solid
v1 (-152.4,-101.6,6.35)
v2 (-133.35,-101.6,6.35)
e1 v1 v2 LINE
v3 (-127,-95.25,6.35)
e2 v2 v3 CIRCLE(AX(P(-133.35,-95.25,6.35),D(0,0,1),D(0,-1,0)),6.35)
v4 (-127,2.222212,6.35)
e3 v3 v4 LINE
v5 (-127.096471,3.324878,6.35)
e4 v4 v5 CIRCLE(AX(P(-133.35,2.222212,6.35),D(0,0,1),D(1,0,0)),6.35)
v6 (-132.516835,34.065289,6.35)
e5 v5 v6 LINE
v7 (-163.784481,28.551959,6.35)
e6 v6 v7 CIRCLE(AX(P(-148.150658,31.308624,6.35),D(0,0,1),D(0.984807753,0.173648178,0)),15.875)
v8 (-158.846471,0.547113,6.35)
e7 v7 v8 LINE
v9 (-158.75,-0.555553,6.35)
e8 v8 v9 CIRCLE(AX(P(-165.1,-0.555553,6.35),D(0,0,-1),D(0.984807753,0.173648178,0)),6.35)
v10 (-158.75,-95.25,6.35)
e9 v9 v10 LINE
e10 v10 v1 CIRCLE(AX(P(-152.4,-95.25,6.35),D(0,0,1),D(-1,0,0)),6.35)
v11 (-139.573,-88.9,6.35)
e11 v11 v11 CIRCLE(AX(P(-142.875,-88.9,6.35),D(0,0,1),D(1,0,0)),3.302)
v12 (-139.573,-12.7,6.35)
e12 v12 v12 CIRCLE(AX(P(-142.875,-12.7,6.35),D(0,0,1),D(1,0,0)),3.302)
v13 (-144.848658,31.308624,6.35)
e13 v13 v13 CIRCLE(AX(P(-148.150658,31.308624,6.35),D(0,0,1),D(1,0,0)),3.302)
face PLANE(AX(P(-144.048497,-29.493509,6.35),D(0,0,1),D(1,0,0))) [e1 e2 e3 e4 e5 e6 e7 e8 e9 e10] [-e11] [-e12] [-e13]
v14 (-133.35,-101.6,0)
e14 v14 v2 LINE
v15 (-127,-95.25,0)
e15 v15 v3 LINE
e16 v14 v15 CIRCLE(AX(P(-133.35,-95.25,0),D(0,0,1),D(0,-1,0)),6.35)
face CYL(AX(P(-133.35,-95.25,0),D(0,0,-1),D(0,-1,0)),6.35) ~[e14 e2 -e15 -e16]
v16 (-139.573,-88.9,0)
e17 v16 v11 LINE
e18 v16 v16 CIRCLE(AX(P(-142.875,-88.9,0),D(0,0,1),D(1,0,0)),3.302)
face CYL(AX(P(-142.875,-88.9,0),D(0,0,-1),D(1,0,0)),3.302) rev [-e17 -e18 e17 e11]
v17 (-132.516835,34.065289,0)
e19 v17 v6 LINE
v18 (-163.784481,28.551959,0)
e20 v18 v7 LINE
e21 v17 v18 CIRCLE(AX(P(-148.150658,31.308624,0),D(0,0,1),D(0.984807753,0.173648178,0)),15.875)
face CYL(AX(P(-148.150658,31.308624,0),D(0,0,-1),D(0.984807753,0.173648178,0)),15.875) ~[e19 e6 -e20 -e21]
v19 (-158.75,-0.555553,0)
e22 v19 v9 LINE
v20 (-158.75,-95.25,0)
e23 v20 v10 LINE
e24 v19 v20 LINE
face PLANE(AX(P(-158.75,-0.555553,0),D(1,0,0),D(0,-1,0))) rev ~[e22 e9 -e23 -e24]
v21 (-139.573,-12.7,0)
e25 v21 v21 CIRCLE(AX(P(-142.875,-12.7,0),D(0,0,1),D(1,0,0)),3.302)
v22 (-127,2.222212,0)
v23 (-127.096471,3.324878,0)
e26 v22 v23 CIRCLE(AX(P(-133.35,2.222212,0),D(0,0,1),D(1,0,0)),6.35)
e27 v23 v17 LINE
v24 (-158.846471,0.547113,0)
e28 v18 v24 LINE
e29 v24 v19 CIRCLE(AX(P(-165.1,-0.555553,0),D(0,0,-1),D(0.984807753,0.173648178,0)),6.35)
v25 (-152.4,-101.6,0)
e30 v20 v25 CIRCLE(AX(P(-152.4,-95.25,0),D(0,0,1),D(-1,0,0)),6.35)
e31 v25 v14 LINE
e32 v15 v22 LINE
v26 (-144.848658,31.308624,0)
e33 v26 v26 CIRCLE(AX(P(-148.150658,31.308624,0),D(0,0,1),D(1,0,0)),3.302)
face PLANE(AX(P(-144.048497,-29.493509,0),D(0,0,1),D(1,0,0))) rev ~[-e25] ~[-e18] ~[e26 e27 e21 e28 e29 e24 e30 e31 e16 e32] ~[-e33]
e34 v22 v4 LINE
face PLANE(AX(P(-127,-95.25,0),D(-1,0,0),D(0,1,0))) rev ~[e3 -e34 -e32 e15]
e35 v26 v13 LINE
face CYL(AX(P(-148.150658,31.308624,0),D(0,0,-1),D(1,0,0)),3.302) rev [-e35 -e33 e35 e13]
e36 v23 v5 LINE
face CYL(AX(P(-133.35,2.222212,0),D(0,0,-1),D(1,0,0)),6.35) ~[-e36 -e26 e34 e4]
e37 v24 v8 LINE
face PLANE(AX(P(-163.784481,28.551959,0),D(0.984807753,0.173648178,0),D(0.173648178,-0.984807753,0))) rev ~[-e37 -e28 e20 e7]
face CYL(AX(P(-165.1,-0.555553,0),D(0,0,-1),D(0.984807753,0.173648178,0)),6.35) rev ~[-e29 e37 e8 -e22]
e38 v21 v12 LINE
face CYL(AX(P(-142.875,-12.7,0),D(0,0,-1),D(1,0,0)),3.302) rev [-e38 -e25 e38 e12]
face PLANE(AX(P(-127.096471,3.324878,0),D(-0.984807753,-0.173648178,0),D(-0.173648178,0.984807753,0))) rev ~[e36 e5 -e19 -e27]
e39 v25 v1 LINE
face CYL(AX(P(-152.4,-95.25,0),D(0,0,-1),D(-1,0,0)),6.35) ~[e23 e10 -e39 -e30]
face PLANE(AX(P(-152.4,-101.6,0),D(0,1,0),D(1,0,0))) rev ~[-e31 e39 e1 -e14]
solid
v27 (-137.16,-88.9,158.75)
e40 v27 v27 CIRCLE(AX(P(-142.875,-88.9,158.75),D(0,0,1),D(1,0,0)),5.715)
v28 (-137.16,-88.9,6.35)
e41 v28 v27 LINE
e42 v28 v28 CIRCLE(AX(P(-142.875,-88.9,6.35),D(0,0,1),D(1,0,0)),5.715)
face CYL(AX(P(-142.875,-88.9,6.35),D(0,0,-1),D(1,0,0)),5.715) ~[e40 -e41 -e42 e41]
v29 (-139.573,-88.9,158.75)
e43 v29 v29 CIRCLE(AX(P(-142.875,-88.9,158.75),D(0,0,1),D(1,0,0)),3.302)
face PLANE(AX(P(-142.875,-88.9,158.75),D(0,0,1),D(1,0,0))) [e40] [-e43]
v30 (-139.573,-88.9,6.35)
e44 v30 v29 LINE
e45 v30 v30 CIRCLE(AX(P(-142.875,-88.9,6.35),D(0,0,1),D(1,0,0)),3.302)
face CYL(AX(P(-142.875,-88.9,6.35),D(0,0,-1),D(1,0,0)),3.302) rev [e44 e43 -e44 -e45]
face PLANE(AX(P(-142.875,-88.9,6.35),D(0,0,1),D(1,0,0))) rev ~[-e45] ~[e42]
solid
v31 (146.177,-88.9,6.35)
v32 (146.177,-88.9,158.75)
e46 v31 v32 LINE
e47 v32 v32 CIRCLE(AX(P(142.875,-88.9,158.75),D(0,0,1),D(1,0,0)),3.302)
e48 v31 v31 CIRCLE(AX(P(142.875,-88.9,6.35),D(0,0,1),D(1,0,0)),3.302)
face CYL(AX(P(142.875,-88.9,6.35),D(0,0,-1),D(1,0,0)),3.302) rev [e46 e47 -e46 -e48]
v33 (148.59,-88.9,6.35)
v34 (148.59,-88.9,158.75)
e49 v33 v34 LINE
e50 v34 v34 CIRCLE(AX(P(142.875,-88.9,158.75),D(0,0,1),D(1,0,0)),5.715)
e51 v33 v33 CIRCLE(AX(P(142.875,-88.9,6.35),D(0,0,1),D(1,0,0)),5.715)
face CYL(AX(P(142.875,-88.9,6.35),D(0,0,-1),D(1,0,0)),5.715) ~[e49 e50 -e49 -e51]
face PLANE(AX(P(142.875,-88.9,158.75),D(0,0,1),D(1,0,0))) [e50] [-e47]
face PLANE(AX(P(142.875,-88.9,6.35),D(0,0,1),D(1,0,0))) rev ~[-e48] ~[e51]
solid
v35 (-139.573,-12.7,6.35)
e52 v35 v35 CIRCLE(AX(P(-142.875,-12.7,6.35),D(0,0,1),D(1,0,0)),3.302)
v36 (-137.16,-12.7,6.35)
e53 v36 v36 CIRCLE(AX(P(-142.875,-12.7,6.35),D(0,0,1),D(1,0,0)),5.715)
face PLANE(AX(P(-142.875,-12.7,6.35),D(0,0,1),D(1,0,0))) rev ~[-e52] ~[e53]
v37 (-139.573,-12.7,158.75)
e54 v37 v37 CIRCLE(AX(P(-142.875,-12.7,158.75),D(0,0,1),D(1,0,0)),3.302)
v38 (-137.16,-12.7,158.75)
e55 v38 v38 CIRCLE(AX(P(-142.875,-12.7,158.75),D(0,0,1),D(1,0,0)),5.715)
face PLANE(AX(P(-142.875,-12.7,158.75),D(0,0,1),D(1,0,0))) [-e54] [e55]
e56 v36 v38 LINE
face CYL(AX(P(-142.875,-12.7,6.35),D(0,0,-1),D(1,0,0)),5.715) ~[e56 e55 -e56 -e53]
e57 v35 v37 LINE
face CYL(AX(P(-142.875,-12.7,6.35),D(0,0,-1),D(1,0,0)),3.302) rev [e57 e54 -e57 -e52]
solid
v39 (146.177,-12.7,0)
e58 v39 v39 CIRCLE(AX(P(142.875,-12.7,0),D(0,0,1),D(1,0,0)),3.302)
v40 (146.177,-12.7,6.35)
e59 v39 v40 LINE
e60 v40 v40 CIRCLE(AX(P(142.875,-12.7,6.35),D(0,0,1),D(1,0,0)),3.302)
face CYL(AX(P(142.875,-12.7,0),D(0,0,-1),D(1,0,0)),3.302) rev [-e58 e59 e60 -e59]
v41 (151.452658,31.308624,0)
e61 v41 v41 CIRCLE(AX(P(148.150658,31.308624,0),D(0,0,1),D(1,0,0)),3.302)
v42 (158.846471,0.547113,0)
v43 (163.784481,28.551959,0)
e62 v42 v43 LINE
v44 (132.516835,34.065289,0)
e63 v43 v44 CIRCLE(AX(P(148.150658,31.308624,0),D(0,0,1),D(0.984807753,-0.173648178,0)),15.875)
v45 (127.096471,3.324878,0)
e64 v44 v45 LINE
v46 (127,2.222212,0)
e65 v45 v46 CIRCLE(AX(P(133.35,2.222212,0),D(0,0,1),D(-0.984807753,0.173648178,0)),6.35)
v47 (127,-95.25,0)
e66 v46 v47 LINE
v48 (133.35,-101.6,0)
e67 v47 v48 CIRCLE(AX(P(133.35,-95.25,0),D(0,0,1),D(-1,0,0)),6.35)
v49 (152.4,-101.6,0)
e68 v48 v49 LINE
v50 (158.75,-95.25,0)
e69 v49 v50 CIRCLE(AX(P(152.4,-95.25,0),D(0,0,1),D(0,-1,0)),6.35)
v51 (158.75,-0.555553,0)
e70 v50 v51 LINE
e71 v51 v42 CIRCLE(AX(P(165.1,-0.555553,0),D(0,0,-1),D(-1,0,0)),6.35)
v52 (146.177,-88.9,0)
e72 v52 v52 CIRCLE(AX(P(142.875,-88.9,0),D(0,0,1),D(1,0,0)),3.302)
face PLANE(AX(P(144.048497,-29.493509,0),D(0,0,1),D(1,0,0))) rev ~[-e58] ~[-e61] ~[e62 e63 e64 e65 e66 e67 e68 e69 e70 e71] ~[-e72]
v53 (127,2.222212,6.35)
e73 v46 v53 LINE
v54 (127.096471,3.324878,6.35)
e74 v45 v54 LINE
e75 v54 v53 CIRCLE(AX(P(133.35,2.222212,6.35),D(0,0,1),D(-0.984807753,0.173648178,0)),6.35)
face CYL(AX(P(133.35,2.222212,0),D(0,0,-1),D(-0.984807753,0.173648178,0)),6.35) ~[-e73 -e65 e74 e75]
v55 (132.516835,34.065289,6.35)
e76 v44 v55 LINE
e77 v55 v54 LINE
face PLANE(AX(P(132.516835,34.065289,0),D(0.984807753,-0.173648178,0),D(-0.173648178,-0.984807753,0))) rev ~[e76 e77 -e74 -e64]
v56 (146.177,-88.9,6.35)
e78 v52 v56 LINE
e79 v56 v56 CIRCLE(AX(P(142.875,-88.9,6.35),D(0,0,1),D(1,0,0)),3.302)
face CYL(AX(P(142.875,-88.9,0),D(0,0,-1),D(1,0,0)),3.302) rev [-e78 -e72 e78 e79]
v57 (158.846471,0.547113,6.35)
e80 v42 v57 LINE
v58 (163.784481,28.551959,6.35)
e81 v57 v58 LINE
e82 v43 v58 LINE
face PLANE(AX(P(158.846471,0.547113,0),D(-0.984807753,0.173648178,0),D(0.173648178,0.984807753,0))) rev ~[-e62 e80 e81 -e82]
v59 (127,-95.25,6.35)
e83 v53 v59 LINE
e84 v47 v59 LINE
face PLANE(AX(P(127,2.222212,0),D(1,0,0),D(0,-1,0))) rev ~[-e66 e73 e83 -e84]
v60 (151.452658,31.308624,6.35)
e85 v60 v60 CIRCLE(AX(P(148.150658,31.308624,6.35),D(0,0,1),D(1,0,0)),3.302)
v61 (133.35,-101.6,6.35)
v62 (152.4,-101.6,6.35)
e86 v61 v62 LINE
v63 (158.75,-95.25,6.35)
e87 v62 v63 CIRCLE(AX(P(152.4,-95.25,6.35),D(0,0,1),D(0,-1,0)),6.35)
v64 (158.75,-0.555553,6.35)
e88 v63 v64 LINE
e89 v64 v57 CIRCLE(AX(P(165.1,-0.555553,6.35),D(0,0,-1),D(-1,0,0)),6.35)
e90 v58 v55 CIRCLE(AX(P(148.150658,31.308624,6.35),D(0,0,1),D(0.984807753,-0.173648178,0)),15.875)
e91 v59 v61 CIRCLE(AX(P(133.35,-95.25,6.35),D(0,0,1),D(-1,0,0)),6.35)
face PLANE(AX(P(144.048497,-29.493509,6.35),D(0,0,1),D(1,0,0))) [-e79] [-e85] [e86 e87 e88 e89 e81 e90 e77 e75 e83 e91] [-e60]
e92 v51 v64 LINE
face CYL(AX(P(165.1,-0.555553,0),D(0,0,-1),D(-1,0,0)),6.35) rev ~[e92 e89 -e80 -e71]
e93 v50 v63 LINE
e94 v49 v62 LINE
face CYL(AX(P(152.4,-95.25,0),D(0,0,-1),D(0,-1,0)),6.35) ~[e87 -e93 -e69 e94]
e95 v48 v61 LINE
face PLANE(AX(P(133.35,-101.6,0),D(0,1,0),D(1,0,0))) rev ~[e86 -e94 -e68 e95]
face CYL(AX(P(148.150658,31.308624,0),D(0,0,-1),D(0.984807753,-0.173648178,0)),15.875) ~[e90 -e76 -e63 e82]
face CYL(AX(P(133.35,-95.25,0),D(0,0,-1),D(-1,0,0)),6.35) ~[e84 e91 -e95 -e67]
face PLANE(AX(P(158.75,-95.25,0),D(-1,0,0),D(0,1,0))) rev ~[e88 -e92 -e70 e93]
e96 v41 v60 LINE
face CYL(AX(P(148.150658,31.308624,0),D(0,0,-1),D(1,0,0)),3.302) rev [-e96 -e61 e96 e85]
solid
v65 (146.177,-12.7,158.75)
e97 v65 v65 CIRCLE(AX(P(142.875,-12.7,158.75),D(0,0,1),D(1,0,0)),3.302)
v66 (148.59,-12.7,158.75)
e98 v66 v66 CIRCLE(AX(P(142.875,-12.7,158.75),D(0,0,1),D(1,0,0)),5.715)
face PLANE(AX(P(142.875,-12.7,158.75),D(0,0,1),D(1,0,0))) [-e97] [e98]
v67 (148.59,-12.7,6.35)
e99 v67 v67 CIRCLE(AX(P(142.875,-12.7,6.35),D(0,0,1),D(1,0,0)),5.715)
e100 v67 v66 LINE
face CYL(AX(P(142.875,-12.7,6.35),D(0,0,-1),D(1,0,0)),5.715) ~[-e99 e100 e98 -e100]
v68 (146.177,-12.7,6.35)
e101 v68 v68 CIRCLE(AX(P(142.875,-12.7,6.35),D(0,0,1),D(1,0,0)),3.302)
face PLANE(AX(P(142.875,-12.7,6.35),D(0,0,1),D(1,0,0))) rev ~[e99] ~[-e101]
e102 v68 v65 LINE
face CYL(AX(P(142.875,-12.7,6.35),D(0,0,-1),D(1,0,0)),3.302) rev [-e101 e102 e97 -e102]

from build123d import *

# Parameters (mm, degrees)
F0_R     = 3.302
F1_DEPTH = 6.35
F2_R     = 5.715
F2_R_2   = 3.302
F3_DEPTH = 152.4


# Not quite as in the source:
# - a feature names something its author has since deleted; it is built from what else it names


with BuildPart() as f1:
    # F0 (on Top) → F1 (new body)
    with BuildSketch(Plane.XY):
        with BuildLine():
            ThreePointArc((-132.5168345954, 34.0652888097), (-150.9073224949, 46.9424470683), (-163.7844807535, 28.5519591688))
            Line((-163.7844807535, 28.5519591688), (-158.8464707684, 0.5471129148))
            ThreePointArc((-158.8464707684, 0.5471129148), (-158.7741636671, -0.0021140469), (-158.75, -0.5555530134))
            Line((-158.75, -0.5555530134), (-158.75, -95.25))
            ThreePointArc((-158.75, -95.25), (-156.8901280605, -99.7401280605), (-152.4, -101.6))
            Line((-152.4, -101.6), (-133.35, -101.6))
            ThreePointArc((-133.35, -101.6), (-128.8598719395, -99.7401280605), (-127, -95.25))
            Line((-127, -95.25), (-127, 0))
            Line((-127, 0), (-127, 2.2222120536))
            ThreePointArc((-127, 2.2222120536), (-127.0241636671, 2.77565102), (-127.0964707684, 3.3248779817))
            Line((-127.0964707684, 3.3248779817), (-132.5168345954, 34.0652888097))
        make_face()
        with Locations((-142.875, -88.9)):
            Circle(F0_R, mode=Mode.SUBTRACT)
        with Locations((-142.875, -12.7)):
            Circle(F0_R, mode=Mode.SUBTRACT)
        with Locations((-148.1506576745, 31.3086239893)):
            Circle(F0_R, mode=Mode.SUBTRACT)
    extrude(amount=F1_DEPTH)


with BuildPart() as f1b:
    # F0 (on Top) → F1, piece 2 (new body)
    with BuildSketch(Plane.XY):
        with BuildLine():
            ThreePointArc((163.7844807535, 28.5519591688), (150.9073224949, 46.9424470683), (132.5168345954, 34.0652888097))
            Line((132.5168345954, 34.0652888097), (127.0964707684, 3.3248779817))
            ThreePointArc((127.0964707684, 3.3248779817), (127.0241636671, 2.77565102), (127, 2.2222120536))
            Line((127, 2.2222120536), (127, 0))
            Line((127, 0), (127, -95.25))
            ThreePointArc((127, -95.25), (128.8598719395, -99.7401280605), (133.35, -101.6))
            Line((133.35, -101.6), (152.4, -101.6))
            ThreePointArc((152.4, -101.6), (156.8901280605, -99.7401280605), (158.75, -95.25))
            Line((158.75, -95.25), (158.75, -0.5555530134))
            ThreePointArc((158.75, -0.5555530134), (158.7741636671, -0.0021140469), (158.8464707684, 0.5471129148))
            Line((158.8464707684, 0.5471129148), (163.7844807535, 28.5519591688))
        make_face()
        with Locations((142.875, -88.9)):
            Circle(F0_R, mode=Mode.SUBTRACT)
        with Locations((142.875, -12.7)):
            Circle(F0_R, mode=Mode.SUBTRACT)
        with Locations((148.1506576745, 31.3086239893)):
            Circle(F0_R, mode=Mode.SUBTRACT)
    extrude(amount=F1_DEPTH)


with BuildPart() as f3:
    # F2 (on face) → F3 (new body)
    with BuildSketch(Plane.XY.offset(6.35)):
        with Locations((-142.875, -12.7)):
            Circle(F2_R)
        with Locations((-142.875, -12.7)):
            Circle(F2_R_2, mode=Mode.SUBTRACT)
    extrude(amount=F3_DEPTH)


with BuildPart() as f3b:
    # F2 (on face) → F3, piece 2 (new body)
    with BuildSketch(Plane.XY.offset(6.35)):
        with Locations((-142.875, -88.9)):
            Circle(F2_R)
        with Locations((-142.875, -88.9)):
            Circle(F2_R_2, mode=Mode.SUBTRACT)
    extrude(amount=F3_DEPTH)


with BuildPart() as f3c:
    # F2 (on face) → F3, piece 3 (new body)
    with BuildSketch(Plane.XY.offset(6.35)):
        with Locations((142.875, -12.7)):
            Circle(F2_R)
        with Locations((142.875, -12.7)):
            Circle(F2_R_2, mode=Mode.SUBTRACT)
    extrude(amount=F3_DEPTH)


with BuildPart() as f3d:
    # F2 (on face) → F3, piece 4 (new body)
    with BuildSketch(Plane.XY.offset(6.35)):
        with Locations((142.875, -88.9)):
            Circle(F2_R)
        with Locations((142.875, -88.9)):
            Circle(F2_R_2, mode=Mode.SUBTRACT)
    extrude(amount=F3_DEPTH)


solid = Compound([f1.part, f1b.part, f3.part, f3b.part, f3c.part, f3d.part])
